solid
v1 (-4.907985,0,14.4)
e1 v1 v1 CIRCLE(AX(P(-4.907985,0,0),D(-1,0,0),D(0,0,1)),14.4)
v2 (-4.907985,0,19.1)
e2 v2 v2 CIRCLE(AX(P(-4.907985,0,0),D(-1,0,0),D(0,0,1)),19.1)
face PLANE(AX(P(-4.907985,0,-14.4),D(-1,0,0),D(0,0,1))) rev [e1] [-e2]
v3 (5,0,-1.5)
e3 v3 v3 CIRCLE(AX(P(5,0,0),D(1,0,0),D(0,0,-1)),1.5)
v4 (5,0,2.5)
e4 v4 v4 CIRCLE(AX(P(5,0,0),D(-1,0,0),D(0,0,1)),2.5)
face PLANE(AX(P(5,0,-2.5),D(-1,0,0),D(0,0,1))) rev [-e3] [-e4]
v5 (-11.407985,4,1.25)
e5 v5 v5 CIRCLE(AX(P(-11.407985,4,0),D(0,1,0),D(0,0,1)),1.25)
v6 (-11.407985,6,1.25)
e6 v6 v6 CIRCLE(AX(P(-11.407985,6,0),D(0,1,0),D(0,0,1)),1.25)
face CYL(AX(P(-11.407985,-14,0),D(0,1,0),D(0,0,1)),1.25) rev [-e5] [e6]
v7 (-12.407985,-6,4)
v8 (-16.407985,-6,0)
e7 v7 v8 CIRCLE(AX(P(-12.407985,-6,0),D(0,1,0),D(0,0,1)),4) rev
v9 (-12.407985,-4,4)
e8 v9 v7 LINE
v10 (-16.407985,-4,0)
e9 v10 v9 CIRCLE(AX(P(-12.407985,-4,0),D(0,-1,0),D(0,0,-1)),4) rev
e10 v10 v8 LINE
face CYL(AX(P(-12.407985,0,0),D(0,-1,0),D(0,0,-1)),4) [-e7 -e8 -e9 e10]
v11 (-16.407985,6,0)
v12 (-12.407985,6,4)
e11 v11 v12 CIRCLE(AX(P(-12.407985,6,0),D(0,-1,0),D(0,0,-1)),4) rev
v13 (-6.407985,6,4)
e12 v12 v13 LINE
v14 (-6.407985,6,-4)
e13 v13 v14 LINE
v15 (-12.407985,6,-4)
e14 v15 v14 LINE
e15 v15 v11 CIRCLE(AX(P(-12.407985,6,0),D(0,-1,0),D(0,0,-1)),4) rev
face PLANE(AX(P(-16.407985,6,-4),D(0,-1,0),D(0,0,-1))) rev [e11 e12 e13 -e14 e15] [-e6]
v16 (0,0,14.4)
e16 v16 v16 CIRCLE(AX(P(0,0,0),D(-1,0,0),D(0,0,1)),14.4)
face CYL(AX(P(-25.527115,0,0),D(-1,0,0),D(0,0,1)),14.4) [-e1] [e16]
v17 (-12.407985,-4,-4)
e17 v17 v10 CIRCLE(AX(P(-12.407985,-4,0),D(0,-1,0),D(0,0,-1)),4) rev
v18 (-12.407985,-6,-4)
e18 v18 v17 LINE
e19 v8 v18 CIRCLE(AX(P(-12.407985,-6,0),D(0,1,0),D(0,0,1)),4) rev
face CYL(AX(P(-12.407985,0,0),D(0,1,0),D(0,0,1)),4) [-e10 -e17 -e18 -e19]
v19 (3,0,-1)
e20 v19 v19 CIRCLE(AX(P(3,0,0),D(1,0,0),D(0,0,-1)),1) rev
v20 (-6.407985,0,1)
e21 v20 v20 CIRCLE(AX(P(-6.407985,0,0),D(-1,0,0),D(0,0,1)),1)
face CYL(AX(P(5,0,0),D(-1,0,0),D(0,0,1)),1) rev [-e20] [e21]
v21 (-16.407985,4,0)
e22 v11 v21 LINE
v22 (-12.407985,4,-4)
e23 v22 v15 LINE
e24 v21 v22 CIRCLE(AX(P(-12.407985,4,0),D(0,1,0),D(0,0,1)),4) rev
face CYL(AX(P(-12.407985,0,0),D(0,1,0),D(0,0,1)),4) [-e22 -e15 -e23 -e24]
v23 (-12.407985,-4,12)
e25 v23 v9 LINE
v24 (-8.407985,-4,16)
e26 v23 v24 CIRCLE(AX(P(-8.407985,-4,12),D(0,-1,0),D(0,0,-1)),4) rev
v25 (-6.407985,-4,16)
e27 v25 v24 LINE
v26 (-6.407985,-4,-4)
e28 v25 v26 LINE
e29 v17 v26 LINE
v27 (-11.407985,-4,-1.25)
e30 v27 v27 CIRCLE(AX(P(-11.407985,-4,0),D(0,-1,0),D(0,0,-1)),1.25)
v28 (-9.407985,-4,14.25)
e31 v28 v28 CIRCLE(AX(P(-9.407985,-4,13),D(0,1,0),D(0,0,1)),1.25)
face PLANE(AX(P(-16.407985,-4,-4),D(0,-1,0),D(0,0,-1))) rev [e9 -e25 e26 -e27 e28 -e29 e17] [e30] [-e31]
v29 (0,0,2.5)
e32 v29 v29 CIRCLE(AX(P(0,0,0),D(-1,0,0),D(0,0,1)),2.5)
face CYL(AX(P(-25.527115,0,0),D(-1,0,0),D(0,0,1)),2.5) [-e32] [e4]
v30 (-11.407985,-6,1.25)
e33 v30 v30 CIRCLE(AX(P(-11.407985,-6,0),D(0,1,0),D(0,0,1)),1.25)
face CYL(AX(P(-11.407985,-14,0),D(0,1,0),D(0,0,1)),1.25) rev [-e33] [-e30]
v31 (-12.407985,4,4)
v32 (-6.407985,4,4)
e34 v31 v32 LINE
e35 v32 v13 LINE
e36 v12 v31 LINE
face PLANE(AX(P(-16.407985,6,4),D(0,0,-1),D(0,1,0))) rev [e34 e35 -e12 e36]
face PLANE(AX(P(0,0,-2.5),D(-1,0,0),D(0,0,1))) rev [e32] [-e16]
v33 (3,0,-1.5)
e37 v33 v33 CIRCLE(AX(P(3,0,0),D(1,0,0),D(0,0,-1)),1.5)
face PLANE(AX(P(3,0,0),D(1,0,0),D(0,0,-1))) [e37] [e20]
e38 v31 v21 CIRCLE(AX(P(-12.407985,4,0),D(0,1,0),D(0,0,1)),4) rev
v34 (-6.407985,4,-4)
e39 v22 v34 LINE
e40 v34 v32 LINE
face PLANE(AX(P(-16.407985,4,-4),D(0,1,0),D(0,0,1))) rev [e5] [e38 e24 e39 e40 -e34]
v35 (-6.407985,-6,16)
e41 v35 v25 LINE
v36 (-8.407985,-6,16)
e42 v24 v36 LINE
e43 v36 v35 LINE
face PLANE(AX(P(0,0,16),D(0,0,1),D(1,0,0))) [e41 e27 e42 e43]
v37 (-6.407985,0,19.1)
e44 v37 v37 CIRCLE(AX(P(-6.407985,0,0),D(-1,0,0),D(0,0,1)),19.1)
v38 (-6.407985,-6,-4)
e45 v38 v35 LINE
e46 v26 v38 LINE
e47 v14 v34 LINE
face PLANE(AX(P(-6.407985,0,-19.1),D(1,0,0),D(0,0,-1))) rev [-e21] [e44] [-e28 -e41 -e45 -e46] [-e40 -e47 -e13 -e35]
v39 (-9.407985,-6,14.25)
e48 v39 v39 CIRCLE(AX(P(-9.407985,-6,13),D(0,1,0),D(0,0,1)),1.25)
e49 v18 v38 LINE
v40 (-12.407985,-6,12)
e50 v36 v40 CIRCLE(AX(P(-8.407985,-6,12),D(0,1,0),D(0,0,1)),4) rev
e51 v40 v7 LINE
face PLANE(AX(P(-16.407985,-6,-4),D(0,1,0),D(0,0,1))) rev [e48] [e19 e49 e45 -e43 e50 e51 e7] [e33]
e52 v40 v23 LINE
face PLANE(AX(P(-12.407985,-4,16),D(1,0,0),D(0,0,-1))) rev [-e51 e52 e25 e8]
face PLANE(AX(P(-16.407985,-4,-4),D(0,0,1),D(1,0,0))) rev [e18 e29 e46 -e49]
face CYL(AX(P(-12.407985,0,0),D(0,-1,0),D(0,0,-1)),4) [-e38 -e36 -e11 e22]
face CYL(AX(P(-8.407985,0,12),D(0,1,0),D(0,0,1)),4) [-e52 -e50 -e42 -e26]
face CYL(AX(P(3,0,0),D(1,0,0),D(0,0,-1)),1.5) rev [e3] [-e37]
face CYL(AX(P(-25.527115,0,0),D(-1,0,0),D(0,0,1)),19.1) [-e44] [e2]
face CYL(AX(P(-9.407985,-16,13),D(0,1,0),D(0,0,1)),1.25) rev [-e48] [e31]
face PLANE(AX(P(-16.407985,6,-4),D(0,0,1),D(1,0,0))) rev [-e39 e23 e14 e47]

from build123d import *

# Parameters (mm, degrees)
SKETCH2_R           = 1
CUT_EXTRUDE1_DEPTH  = 30.321700517
SKETCH3_R           = 1.5
CUT_EXTRUDE2_DEPTH  = 2
SKETCH4_W           = 8
SKETCH4_H           = 2
BOSS_EXTRUDE1_DEPTH = 10
SKETCH6_R           = 1.25
CUT_EXTRUDE4_DEPTH  = 20
FILLET1_R           = 4
SKETCH7_W           = 6
SKETCH7_H           = 2
BOSS_EXTRUDE2_DEPTH = 12
SKETCH8_R           = 1.25
CUT_EXTRUDE5_DEPTH  = 12
FILLET2_R           = 4


with BuildPart() as part:
    # Sketch1 → Revolve1 (revolve)
    with BuildSketch(Plane(origin=(0, 0, 0), x_dir=(1, 0, 0), z_dir=(0, 1, 0)), mode=Mode.PRIVATE) as revolve1_sk:
        Polygon((0, 2.5), (0, 14.4), (-4.907984975, 14.4), (-4.907984975, 19.1), (-6.407984975, 19.1), (-6.407984975, 0), (0, 0), (5, 0), (5, 2.5), align=None)
    revolve(revolve1_sk.sketch.rotate(Axis((-25.527114743, 0, 0), (1, 0, 0)), 180), axis=Axis((-25.527114743, 0, 0), (1, 0, 0)))

    # Sketch2 → Cut-Extrude1 (cut, through all)
    with BuildSketch(Plane.ZY.offset(6.407984975)):
        Circle(SKETCH2_R)
    extrude(amount=-CUT_EXTRUDE1_DEPTH, mode=Mode.SUBTRACT)

    # Sketch3 → Cut-Extrude2 (cut)
    with BuildSketch(Plane(origin=(5, 0, 0), x_dir=(0, 0, -1), z_dir=(1, 0, 0))):
        Circle(SKETCH3_R)
    extrude(amount=-CUT_EXTRUDE2_DEPTH, mode=Mode.SUBTRACT)

    # Sketch4 → Boss-Extrude1 (add)
    with BuildSketch(Plane.ZY.offset(6.407984975)):
        with Locations((0, 5)):
            Rectangle(SKETCH4_W, SKETCH4_H)
        with Locations((0, -5)):
            Rectangle(SKETCH4_W, SKETCH4_H)
    extrude(amount=BOSS_EXTRUDE1_DEPTH)

    # Sketch6 → Cut-Extrude4 (cut)
    with BuildSketch(Plane(origin=(0, 6, 0), x_dir=(1, 0, 0), z_dir=(0, 1, 0))):
        with Locations(Location((-11.407984975, 0, 0), (0, 0, 270))):
            Circle(SKETCH6_R)
    extrude(amount=-CUT_EXTRUDE4_DEPTH, mode=Mode.SUBTRACT)

    # Fillet1
    fillet1_edges = [part.edges().sort_by_distance(p)[0] for p in [
        (-16.407984975, -5, 4),
        (-16.407984975, -5, -4),
        (-16.407984975, 5, 4),
        (-16.407984975, 5, -4),
    ]]
    fillet(fillet1_edges, radius=FILLET1_R - 0.0001)  # a hair under: the kernel refuses the full size

    # Sketch7 → Boss-Extrude2 (add)
    with BuildSketch(Plane.XY.offset(4)):
        with Locations((-9.407984975, -5)):
            Rectangle(SKETCH7_W, SKETCH7_H)
    extrude(amount=BOSS_EXTRUDE2_DEPTH)

    # Sketch8 → Cut-Extrude5 (cut)
    with BuildSketch(Plane(origin=(0, -4, 0), x_dir=(1, 0, 0), z_dir=(0, 1, 0))):
        with Locations(Location((-9.407984975, -13, 0), (0, 0, 270))):
            Circle(SKETCH8_R)
    extrude(amount=-CUT_EXTRUDE5_DEPTH, mode=Mode.SUBTRACT)

    # Fillet2
    fillet2_edges = [part.edges().sort_by_distance(p)[0] for p in [
        (-12.407984975, -5, 16),
    ]]
    fillet(fillet2_edges, radius=FILLET2_R)


solid = part.part
